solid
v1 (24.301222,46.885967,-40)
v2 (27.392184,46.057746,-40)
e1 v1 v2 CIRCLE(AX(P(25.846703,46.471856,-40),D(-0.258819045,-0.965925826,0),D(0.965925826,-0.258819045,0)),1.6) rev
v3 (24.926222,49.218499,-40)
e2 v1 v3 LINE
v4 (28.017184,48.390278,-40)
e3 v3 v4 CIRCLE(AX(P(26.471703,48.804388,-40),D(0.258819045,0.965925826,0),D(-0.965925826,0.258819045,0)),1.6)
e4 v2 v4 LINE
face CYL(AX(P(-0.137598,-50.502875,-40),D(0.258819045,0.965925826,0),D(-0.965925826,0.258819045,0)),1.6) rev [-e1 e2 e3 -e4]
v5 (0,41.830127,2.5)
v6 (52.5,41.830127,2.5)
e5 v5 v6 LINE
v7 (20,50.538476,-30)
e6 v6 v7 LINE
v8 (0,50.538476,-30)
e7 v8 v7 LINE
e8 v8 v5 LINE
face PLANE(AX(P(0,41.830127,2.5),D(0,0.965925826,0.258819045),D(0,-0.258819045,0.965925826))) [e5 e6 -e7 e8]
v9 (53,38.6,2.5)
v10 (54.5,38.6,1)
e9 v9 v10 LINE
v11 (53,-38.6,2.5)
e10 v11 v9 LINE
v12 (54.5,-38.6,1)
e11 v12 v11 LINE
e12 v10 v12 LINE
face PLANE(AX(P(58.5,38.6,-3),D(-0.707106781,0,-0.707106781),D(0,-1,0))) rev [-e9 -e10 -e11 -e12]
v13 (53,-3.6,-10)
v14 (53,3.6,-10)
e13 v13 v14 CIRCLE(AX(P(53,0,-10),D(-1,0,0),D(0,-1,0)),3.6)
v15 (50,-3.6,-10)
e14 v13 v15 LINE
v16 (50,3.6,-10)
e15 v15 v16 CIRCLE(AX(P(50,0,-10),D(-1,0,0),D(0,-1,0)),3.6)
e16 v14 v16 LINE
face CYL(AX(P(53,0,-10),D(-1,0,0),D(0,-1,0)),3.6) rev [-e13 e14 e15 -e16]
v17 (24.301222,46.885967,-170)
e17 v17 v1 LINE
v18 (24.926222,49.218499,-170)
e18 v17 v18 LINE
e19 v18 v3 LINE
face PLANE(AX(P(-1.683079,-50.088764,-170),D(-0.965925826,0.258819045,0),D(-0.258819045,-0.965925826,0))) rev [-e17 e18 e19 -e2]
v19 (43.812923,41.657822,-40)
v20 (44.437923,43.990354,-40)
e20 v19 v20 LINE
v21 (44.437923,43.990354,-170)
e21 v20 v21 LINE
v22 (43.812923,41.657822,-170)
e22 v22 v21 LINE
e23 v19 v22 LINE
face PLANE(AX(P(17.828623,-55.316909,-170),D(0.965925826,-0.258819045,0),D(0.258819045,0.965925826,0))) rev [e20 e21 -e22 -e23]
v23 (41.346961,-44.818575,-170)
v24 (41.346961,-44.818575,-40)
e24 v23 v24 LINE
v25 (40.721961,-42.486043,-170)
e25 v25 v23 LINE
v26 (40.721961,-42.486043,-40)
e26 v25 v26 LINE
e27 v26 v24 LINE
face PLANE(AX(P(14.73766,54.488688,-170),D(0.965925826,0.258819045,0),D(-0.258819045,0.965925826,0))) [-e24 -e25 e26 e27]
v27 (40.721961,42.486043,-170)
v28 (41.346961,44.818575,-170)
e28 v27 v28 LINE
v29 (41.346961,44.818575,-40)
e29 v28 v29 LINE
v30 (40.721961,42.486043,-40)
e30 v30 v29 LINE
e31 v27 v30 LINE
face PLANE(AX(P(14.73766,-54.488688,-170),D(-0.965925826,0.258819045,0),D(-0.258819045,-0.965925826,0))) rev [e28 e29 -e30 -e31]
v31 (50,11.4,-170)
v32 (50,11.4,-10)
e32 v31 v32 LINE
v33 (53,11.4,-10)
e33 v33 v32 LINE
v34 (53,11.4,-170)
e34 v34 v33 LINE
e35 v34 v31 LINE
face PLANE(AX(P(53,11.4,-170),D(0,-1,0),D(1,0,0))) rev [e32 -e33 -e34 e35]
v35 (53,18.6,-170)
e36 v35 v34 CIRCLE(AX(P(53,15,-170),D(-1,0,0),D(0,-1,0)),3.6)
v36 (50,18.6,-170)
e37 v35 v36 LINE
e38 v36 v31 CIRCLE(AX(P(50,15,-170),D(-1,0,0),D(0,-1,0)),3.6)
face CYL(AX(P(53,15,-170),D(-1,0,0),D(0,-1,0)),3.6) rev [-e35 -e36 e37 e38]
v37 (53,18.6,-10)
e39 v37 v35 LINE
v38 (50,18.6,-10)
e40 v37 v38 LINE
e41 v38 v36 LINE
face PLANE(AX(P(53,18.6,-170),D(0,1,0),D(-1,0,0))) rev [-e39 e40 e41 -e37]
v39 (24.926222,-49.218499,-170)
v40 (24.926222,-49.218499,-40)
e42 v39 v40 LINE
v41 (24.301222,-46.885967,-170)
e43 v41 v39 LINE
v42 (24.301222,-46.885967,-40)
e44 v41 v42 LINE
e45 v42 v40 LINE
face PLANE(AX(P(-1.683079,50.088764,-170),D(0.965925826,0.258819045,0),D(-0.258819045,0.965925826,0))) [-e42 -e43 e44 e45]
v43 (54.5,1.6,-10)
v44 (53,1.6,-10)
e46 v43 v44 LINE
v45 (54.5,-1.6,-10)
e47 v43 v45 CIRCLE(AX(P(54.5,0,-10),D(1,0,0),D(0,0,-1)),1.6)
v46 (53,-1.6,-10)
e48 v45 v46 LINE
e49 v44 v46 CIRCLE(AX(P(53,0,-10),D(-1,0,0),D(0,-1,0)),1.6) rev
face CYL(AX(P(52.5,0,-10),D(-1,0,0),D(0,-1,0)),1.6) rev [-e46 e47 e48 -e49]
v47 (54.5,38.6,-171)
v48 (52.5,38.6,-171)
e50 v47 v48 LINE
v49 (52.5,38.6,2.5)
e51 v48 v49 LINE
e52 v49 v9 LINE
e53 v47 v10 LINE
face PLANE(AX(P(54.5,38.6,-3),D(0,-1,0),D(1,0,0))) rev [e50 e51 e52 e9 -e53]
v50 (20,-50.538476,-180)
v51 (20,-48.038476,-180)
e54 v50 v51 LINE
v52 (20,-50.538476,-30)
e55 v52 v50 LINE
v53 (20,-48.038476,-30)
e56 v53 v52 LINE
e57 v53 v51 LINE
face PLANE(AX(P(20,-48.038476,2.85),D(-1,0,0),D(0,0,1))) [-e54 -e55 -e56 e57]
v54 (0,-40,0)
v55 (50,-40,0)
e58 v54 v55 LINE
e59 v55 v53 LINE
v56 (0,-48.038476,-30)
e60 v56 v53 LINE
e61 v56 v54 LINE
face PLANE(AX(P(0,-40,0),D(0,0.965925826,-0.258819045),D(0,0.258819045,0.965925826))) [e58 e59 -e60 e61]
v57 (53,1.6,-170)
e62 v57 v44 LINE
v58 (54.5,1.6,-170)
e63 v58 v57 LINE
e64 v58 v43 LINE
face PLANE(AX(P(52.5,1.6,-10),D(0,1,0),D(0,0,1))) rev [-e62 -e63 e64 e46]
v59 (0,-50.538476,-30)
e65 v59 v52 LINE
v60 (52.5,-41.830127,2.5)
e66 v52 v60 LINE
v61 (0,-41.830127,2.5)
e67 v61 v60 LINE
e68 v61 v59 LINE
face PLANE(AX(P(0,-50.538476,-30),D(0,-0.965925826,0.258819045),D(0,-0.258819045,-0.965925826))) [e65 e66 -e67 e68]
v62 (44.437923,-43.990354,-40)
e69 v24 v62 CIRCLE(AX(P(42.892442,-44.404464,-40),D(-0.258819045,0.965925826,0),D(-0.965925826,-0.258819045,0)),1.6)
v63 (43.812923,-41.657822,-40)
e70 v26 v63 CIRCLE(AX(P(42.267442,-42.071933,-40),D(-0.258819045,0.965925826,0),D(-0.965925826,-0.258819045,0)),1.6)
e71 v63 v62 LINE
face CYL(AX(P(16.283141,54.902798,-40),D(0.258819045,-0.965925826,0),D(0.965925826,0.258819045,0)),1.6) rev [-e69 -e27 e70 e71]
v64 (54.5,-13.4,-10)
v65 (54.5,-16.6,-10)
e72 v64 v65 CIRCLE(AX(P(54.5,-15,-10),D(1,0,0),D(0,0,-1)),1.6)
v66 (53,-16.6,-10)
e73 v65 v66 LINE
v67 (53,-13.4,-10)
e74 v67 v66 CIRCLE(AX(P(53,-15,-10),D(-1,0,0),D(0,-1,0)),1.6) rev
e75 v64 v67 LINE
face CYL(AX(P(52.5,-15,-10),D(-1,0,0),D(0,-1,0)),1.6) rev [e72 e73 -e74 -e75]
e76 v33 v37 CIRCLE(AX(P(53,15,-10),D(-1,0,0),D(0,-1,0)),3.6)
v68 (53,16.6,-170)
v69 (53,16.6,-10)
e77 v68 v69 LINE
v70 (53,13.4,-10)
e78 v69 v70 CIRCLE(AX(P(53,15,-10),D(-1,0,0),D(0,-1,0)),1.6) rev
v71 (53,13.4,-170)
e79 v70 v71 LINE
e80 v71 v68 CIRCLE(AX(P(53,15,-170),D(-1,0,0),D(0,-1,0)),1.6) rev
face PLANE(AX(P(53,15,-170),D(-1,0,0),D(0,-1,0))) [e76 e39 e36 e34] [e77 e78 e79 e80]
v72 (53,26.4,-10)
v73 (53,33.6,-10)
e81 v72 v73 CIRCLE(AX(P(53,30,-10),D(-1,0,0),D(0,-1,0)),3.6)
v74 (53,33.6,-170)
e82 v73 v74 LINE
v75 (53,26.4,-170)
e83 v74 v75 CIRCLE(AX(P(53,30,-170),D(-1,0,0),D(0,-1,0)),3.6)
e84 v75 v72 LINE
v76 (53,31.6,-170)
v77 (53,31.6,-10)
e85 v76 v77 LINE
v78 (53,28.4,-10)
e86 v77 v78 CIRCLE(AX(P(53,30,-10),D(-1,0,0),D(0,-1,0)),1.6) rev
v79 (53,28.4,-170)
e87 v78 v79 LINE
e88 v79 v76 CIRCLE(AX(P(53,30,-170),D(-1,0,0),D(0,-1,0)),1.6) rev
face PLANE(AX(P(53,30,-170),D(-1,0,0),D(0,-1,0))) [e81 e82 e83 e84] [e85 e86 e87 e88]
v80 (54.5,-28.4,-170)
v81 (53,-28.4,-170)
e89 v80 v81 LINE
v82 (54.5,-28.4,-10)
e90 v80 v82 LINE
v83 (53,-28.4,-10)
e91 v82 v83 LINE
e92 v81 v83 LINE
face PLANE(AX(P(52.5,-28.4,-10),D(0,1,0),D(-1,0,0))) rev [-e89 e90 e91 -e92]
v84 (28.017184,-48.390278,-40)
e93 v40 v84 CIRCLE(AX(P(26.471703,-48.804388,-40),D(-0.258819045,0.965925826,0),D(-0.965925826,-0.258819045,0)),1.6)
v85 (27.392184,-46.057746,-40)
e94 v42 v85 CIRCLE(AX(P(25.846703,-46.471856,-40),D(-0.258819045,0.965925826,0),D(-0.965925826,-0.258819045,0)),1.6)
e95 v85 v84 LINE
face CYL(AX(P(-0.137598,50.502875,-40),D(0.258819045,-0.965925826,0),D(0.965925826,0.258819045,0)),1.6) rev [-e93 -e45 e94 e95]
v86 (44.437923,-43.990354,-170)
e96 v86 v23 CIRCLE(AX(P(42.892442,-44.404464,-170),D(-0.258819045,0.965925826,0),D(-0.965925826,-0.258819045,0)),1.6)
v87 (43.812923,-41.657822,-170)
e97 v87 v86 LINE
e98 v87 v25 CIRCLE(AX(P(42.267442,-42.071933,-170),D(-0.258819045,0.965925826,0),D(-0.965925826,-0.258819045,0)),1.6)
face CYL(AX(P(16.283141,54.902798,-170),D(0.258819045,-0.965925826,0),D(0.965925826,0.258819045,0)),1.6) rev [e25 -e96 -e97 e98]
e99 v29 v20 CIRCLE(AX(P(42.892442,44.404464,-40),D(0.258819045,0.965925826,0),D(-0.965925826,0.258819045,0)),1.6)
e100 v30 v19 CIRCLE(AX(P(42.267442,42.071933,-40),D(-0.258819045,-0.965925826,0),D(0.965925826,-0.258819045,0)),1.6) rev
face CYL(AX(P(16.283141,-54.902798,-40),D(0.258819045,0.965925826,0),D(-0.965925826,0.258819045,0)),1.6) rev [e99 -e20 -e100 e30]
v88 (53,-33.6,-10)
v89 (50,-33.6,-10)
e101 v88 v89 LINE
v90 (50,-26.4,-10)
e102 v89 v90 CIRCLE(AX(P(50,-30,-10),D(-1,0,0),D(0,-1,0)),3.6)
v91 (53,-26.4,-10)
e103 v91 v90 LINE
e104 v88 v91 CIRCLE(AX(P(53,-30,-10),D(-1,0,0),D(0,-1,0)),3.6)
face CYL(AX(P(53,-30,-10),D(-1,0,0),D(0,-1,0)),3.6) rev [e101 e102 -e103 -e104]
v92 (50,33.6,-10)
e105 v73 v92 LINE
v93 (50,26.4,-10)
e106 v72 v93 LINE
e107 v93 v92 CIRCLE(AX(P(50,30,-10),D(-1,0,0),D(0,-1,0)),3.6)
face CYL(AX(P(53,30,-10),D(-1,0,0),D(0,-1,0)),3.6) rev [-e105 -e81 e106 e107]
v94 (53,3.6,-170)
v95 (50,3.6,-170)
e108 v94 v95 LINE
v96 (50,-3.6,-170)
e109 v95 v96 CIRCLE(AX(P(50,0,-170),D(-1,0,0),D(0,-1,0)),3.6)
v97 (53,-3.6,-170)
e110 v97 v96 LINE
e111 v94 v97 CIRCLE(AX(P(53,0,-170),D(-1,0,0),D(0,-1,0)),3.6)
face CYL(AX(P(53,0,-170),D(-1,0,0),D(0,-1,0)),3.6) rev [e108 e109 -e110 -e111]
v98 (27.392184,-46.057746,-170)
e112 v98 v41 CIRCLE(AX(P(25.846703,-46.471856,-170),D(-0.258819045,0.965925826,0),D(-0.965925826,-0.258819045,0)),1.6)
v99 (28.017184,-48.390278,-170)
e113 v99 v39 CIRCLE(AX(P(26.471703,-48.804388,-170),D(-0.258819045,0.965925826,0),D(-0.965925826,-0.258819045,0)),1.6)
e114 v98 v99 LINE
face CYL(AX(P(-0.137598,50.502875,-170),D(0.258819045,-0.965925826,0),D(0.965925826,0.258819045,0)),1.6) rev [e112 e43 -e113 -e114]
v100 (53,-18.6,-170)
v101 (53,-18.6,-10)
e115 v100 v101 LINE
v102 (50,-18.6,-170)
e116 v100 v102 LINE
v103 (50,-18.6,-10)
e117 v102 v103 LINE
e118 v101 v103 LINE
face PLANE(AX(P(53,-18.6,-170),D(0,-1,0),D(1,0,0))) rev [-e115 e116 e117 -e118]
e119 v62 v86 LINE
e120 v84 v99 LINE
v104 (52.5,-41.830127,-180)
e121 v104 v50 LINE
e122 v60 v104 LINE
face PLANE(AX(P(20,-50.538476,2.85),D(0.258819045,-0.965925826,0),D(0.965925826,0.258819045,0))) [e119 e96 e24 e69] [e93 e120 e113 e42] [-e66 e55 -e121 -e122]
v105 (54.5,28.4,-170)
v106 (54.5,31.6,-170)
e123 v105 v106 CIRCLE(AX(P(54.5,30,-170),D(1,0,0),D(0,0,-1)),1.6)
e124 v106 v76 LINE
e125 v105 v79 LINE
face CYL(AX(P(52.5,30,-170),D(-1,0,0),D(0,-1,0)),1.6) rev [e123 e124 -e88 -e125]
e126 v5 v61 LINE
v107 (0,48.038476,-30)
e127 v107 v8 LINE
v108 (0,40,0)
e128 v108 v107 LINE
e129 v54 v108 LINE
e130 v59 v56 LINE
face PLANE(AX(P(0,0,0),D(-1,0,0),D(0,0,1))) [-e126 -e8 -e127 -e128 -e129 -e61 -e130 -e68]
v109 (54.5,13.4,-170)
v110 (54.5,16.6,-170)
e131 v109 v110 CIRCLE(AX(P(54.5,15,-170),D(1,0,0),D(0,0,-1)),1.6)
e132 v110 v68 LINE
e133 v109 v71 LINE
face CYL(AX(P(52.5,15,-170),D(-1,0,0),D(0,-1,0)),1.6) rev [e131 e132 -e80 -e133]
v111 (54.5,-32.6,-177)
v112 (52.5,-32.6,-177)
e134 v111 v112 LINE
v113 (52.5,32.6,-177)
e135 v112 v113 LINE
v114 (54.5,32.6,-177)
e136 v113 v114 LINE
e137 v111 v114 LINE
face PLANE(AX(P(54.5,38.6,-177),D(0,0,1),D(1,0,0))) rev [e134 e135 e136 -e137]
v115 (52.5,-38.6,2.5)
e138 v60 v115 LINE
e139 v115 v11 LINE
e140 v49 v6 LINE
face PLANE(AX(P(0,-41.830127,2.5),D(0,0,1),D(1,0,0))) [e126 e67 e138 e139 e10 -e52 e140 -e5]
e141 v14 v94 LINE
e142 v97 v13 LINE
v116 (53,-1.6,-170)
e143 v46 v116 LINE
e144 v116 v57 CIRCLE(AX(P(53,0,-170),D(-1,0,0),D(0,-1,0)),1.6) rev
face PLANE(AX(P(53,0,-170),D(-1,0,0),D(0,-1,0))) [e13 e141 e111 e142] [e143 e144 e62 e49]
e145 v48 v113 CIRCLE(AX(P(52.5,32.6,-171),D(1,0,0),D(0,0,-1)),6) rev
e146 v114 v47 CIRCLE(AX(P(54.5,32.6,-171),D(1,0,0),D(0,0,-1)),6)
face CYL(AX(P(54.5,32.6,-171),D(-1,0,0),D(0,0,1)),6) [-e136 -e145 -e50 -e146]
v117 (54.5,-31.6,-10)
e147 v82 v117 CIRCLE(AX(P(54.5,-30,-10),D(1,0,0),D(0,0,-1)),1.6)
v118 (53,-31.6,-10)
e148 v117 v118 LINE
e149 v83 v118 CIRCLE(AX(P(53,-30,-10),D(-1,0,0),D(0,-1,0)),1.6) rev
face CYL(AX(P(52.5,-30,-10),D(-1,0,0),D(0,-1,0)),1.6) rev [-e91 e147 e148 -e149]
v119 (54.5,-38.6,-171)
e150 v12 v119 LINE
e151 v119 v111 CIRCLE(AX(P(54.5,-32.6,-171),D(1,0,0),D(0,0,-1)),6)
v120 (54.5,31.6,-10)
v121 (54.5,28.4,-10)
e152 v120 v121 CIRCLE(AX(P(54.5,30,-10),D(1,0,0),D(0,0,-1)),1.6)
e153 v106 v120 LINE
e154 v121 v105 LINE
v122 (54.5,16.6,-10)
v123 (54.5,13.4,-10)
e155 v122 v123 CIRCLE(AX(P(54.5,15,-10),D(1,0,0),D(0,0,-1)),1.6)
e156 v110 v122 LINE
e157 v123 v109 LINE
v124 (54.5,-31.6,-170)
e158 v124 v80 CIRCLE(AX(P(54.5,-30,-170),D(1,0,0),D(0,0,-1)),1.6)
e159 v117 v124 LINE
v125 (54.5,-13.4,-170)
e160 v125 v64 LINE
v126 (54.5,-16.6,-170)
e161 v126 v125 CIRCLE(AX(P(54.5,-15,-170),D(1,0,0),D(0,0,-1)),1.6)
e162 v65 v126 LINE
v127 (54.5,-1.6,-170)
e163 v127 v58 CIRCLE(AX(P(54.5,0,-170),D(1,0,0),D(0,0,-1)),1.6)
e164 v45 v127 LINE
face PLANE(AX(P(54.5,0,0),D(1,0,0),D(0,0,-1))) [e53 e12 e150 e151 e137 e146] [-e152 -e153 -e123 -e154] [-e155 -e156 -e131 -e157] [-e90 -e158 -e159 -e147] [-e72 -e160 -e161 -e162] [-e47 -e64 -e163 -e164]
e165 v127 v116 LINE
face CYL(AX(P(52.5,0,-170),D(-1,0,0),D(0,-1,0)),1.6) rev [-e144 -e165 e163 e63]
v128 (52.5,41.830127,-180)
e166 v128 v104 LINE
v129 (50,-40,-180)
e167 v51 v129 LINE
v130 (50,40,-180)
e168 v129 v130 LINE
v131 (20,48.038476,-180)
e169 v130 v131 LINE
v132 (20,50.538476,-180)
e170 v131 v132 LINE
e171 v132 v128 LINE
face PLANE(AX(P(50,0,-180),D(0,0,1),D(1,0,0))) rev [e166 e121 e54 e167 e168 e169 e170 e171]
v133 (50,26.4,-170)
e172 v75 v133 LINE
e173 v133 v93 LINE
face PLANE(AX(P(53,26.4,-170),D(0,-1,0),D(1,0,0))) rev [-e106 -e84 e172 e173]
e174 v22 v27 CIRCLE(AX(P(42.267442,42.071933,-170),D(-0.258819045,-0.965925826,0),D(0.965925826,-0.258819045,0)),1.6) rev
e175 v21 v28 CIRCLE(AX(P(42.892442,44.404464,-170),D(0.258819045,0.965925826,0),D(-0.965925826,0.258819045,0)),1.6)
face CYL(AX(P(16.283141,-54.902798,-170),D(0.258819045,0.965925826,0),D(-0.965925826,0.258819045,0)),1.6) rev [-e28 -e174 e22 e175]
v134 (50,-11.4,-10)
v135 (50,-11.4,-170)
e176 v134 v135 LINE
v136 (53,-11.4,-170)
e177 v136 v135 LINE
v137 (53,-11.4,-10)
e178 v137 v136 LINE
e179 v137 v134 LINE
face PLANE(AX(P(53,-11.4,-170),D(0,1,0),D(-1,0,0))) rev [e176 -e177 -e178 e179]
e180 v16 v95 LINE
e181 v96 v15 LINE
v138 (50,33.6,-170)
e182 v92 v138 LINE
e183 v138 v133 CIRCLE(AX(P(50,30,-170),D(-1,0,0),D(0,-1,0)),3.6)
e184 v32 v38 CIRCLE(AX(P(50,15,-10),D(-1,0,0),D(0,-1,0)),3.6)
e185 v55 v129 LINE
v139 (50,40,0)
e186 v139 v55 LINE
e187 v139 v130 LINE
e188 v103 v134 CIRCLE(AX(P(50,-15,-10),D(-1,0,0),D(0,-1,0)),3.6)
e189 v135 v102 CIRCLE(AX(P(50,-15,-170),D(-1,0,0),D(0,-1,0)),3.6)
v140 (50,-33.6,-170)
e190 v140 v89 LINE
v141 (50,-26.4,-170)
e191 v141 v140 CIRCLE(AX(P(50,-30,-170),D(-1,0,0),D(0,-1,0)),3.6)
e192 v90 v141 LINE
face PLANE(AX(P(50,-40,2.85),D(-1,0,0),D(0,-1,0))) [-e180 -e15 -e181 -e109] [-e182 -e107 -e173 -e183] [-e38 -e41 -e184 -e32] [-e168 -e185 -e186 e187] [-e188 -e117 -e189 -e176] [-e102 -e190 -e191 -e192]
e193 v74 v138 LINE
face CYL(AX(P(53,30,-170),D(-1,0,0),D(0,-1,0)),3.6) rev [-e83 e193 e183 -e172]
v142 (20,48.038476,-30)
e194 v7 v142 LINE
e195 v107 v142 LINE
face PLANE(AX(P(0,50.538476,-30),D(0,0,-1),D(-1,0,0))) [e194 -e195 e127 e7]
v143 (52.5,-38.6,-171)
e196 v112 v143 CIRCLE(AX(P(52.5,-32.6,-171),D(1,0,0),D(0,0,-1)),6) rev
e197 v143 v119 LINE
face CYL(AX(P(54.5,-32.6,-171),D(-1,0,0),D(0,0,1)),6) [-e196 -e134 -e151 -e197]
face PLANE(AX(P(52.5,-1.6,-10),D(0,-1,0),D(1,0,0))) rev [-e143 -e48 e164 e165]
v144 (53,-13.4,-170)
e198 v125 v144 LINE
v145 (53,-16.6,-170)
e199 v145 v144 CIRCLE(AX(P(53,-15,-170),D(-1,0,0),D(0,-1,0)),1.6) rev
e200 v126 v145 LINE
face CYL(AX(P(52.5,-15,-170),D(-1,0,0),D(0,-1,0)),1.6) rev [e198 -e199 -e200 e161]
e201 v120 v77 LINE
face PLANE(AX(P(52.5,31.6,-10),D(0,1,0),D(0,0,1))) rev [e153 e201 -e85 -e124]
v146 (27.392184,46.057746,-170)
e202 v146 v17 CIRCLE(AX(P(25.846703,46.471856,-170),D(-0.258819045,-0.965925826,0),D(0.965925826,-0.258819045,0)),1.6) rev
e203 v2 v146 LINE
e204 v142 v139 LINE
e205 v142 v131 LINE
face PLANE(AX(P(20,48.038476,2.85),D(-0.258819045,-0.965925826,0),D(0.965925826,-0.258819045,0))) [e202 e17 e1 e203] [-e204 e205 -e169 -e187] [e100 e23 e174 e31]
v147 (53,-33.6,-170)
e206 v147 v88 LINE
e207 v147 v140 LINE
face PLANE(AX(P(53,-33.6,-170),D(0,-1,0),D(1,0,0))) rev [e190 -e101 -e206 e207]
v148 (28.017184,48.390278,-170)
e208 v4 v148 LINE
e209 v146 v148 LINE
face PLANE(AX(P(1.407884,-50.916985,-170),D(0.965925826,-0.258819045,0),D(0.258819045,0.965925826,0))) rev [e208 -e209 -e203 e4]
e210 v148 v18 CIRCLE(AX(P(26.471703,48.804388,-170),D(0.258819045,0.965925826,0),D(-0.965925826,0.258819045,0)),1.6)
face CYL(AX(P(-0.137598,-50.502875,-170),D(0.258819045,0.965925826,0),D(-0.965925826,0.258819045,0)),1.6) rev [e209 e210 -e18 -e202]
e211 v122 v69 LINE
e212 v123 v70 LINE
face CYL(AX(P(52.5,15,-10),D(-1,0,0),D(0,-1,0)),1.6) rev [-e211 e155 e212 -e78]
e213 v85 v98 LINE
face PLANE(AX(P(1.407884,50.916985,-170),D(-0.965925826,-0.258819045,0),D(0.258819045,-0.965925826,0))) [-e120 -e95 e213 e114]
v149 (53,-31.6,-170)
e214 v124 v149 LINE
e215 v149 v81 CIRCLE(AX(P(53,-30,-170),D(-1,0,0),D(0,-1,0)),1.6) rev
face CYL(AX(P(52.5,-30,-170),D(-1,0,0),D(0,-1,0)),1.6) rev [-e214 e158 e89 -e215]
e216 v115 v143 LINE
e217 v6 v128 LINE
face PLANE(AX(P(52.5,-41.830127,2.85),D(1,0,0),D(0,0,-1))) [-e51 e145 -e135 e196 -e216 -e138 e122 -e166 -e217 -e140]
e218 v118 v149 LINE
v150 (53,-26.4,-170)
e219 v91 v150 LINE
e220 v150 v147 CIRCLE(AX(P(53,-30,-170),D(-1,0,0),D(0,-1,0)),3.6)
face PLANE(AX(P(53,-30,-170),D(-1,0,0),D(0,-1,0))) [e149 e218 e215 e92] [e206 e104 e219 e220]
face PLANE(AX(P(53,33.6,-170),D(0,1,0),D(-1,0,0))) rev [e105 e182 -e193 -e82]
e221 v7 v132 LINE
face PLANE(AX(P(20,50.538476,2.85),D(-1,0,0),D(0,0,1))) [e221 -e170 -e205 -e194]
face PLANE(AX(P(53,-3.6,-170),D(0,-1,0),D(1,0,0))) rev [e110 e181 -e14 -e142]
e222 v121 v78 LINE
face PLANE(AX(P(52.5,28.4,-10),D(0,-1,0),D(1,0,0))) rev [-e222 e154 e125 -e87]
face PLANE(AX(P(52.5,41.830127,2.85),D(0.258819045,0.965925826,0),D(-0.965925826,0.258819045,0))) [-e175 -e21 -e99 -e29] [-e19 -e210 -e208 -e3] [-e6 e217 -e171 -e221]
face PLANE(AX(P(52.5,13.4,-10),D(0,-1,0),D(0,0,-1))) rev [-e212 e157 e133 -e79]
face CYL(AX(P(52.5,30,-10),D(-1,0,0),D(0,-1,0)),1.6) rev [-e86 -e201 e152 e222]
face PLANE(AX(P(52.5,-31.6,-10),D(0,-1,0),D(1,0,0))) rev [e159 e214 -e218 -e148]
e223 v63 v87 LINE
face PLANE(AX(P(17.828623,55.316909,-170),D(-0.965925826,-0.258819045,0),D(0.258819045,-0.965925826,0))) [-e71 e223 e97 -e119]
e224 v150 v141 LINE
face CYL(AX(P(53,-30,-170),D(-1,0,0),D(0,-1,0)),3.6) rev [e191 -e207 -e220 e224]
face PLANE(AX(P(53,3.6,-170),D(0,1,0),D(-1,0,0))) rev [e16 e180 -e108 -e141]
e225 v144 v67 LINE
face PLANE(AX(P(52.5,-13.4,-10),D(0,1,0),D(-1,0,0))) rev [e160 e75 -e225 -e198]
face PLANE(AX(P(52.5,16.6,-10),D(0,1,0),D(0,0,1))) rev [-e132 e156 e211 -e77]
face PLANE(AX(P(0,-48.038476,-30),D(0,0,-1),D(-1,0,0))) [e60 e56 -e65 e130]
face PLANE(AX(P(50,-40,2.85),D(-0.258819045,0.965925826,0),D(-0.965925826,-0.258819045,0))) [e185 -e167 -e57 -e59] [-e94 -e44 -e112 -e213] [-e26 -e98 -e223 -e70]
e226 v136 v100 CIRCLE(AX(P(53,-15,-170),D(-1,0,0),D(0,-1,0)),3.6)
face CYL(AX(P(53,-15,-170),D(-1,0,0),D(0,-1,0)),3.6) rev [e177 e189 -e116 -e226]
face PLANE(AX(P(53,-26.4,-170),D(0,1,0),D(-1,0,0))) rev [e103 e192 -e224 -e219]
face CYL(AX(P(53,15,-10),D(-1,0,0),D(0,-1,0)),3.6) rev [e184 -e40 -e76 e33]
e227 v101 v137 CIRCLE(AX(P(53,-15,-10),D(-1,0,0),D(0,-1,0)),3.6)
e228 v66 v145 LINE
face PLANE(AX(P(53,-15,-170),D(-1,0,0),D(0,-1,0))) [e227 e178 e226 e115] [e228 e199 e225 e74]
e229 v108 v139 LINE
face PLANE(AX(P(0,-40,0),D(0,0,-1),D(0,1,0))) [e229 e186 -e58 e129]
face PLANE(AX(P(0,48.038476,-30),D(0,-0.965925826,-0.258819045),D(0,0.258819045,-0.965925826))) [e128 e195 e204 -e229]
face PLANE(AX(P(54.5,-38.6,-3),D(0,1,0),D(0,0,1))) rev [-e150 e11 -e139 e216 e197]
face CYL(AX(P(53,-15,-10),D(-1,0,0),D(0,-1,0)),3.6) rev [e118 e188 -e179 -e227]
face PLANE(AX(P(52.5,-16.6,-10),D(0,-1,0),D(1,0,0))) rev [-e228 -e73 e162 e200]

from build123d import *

# Parameters (mm, degrees)
CUT_EXTRUDE1_DEPTH  = 194.530714703
SKETCH7_W           = 174
SKETCH7_H           = 77.2
BOSS_EXTRUDE1_DEPTH = 2
CUT_EXTRUDE2_DEPTH  = 3
FILLET1_R           = 6
CHAMFER1_SIZE       = 6
CUT_EXTRUDE3_REACH  = 213.158


with BuildPart() as part:
    # Sweep1: sweep along a path in Sketch2
    with BuildLine(Plane(origin=(0, 0, 0), x_dir=(1, 0, 0), z_dir=(0, 1, 0))) as sweep1_path:
        Line((0, 0), (50, 0))
        Line((50, 0), (50, 180))
    # Sketch4 → Sweep1 (sweep)
    with BuildSketch(Plane(origin=(0, 0, 0), x_dir=(0, 0, -1), z_dir=(1, 0, 0))):
        Polygon((0, -40), (0, 40), (30, 48.038475773), (30, 50.538475773), (-2.5, 41.830127019), (-2.5, -41.830127019), (30, -50.538475773), (30, -48.038475773), align=None)
    sweep(path=sweep1_path.line, transition=Transition.RIGHT)

    # Sketch6 → Cut-Extrude1 (cut, through all)
    with BuildSketch(Plane.ZY.offset(-50)):
        with BuildLine():
            Line((-10, 28.4), (-170, 28.4))
            ThreePointArc((-170, 28.4), (-171.6, 30), (-170, 31.6))
            Line((-170, 31.6), (-10, 31.6))
            ThreePointArc((-10, 31.6), (-8.4, 30), (-10, 28.4))
        make_face()
        with BuildLine():
            Line((-10, -1.6), (-170, -1.6))
            ThreePointArc((-170, -1.6), (-171.6, 0), (-170, 1.6))
            Line((-170, 1.6), (-10, 1.6))
            ThreePointArc((-10, 1.6), (-8.4, 0), (-10, -1.6))
        make_face()
        with BuildLine():
            Line((-10, -31.6), (-170, -31.6))
            ThreePointArc((-170, -31.6), (-171.6, -30), (-170, -28.4))
            Line((-170, -28.4), (-10, -28.4))
            ThreePointArc((-10, -28.4), (-8.4, -30), (-10, -31.6))
        make_face()
        with BuildLine():
            Line((-10, -16.6), (-170, -16.6))
            ThreePointArc((-170, -16.6), (-171.6, -15), (-170, -13.4))
            Line((-170, -13.4), (-10, -13.4))
            ThreePointArc((-10, -13.4), (-8.4, -15), (-10, -16.6))
        make_face()
        with BuildLine():
            Line((-10, 13.4), (-170, 13.4))
            ThreePointArc((-170, 13.4), (-171.6, 15), (-170, 16.6))
            Line((-170, 16.6), (-10, 16.6))
            ThreePointArc((-10, 16.6), (-8.4, 15), (-10, 13.4))
        make_face()
    extrude(amount=-CUT_EXTRUDE1_DEPTH, mode=Mode.SUBTRACT)

    # Sketch7 → Boss-Extrude1 (add)
    with BuildSketch(Plane(origin=(52.5, 0, 0), x_dir=(0, 0, -1), z_dir=(1, 0, 0))):
        with Locations((90, 0)):
            Rectangle(SKETCH7_W, SKETCH7_H)
        with BuildLine():
            Line((170, -31.6), (10, -31.6))
            ThreePointArc((10, -31.6), (8.4, -30), (10, -28.4))
            Line((10, -28.4), (170, -28.4))
            ThreePointArc((170, -28.4), (171.6, -30), (170, -31.6))
        make_face(mode=Mode.SUBTRACT)
        with BuildLine():
            Line((170, -16.6), (10, -16.6))
            ThreePointArc((10, -16.6), (8.4, -15), (10, -13.4))
            Line((10, -13.4), (170, -13.4))
            ThreePointArc((170, -13.4), (171.6, -15), (170, -16.6))
        make_face(mode=Mode.SUBTRACT)
        with BuildLine():
            Line((10, 1.6), (170, 1.6))
            ThreePointArc((170, 1.6), (171.6, 0), (170, -1.6))
            Line((170, -1.6), (10, -1.6))
            ThreePointArc((10, -1.6), (8.4, 0), (10, 1.6))
        make_face(mode=Mode.SUBTRACT)
        with BuildLine():
            Line((170, 13.4), (10, 13.4))
            ThreePointArc((10, 13.4), (8.4, 15), (10, 16.6))
            Line((10, 16.6), (170, 16.6))
            ThreePointArc((170, 16.6), (171.6, 15), (170, 13.4))
        make_face(mode=Mode.SUBTRACT)
        with BuildLine():
            Line((170, 28.4), (10, 28.4))
            ThreePointArc((10, 28.4), (8.4, 30), (10, 31.6))
            Line((10, 31.6), (170, 31.6))
            ThreePointArc((170, 31.6), (171.6, 30), (170, 28.4))
        make_face(mode=Mode.SUBTRACT)
    extrude(amount=BOSS_EXTRUDE1_DEPTH)

    # Sketch9 → Cut-Extrude2 (cut)
    with BuildSketch(Plane.ZY.offset(-50)):
        with BuildLine():
            Line((-170, 33.6), (-10, 33.6))
            ThreePointArc((-10, 33.6), (-6.4, 30), (-10, 26.4))
            Line((-10, 26.4), (-170, 26.4))
            ThreePointArc((-170, 26.4), (-173.6, 30), (-170, 33.6))
        make_face()
        with BuildLine():
            Line((-170, 18.6), (-10, 18.6))
            ThreePointArc((-10, 18.6), (-6.4, 15), (-10, 11.4))
            Line((-10, 11.4), (-170, 11.4))
            ThreePointArc((-170, 11.4), (-173.6, 15), (-170, 18.6))
        make_face()
        with BuildLine():
            Line((-170, 3.6), (-10, 3.6))
            ThreePointArc((-10, 3.6), (-6.4, 0), (-10, -3.6))
            Line((-10, -3.6), (-170, -3.6))
            ThreePointArc((-170, -3.6), (-173.6, 0), (-170, 3.6))
        make_face()
        with BuildLine():
            Line((-170, -11.4), (-10, -11.4))
            ThreePointArc((-10, -11.4), (-6.4, -15), (-10, -18.6))
            Line((-10, -18.6), (-170, -18.6))
            ThreePointArc((-170, -18.6), (-173.6, -15), (-170, -11.4))
        make_face()
        with BuildLine():
            Line((-170, -26.4), (-10, -26.4))
            ThreePointArc((-10, -26.4), (-6.4, -30), (-10, -33.6))
            Line((-10, -33.6), (-170, -33.6))
            ThreePointArc((-170, -33.6), (-173.6, -30), (-170, -26.4))
        make_face()
    extrude(amount=-CUT_EXTRUDE2_DEPTH, mode=Mode.SUBTRACT)

    # Fillet1
    fillet1_edges = [part.edges().sort_by_distance(p)[0] for p in [
        (53.5, -38.6, -177),
        (53.5, 38.6, -177),
    ]]
    fillet(fillet1_edges, radius=FILLET1_R)

    # Chamfer1
    # the kernel refuses this chamfer: 6 mm, written as the material it adds along each edge
    with BuildSketch(Plane(origin=(52.5, -38.6, -3), x_dir=(-0.02749587661058908, 0, 0.9996219169112968), z_dir=(0, 1, 0))) as chamfer1_piece_1_section:
        Polygon((CHAMFER1_SIZE * 0.999621916911, CHAMFER1_SIZE * 0.0274958766106), (-CHAMFER1_SIZE * 0.0274958766106, CHAMFER1_SIZE * 0.999621916911), (0, 0), align=None)
    chamfer1_piece_1 = extrude(amount=77.2, mode=Mode.PRIVATE)
    chamfer1_piece_1 = split(chamfer1_piece_1, bisect_by=Plane(origin=(53.373608637, 0, 2.5), z_dir=(0, 0, -1)), keep=Keep.TOP, mode=Mode.PRIVATE)
    chamfer1_piece_1 = split(chamfer1_piece_1, bisect_by=Plane(origin=(54.5, 0, -0.51208469), z_dir=(-1, 0, 0)), keep=Keep.TOP, mode=Mode.PRIVATE)
    add(chamfer1_piece_1)

    # Sketch10 → Cut-Extrude3 (cut, up to next)
    with BuildSketch(Plane(origin=(13.974364905, 52.15303983, 0), x_dir=(0.9659258262890679, -0.25881904510252257, 0), z_dir=(0.2588190451025226, 0.9659258262890679, 0)), mode=Mode.PRIVATE) as cut_extrude3_sk1:
        with BuildLine():
            Line((14.538196485, 170), (14.538196485, 40))
            ThreePointArc((14.538196485, 40), (12.938196485, 38.4), (11.338196485, 40))
            Line((11.338196485, 40), (11.338196485, 170))
            ThreePointArc((11.338196485, 170), (12.938196485, 171.6), (14.538196485, 170))
        make_face()
    cut_extrude3_tool1 = extrude(cut_extrude3_sk1.sketch, amount=-CUT_EXTRUDE3_REACH, mode=Mode.PRIVATE) & part.part
    # Sketch10 → Cut-Extrude3 (cut, up to next)
    with BuildSketch(Plane(origin=(13.974364905, 52.15303983, 0), x_dir=(0.9659258262890679, -0.25881904510252257, 0), z_dir=(0.2588190451025226, 0.9659258262890679, 0)), mode=Mode.PRIVATE) as cut_extrude3_sk2:
        with BuildLine():
            Line((31.538196485, 170), (31.538196485, 40))
            ThreePointArc((31.538196485, 40), (29.938196485, 38.4), (28.338196485, 40))
            Line((28.338196485, 40), (28.338196485, 170))
            ThreePointArc((28.338196485, 170), (29.938196485, 171.6), (31.538196485, 170))
        make_face()
    cut_extrude3_tool2 = extrude(cut_extrude3_sk2.sketch, amount=-CUT_EXTRUDE3_REACH, mode=Mode.PRIVATE) & part.part
    cut_extrude3_1 = cut_extrude3_tool1.solids().sort_by_distance((26.471703, 48.804388, -105))[0]
    add(cut_extrude3_1, mode=Mode.SUBTRACT)
    cut_extrude3_2 = cut_extrude3_tool2.solids().sort_by_distance((42.892442, 44.404464, -105))[0]
    add(cut_extrude3_2, mode=Mode.SUBTRACT)
    cut_extrude3 = cut_extrude3_1 + cut_extrude3_2  # Cut-Extrude3 as one shape, for the pattern or mirror that repeats it

    # Mirror1: Cut-Extrude3 across plane
    add(cut_extrude3.mirror(Plane.ZX), mode=Mode.SUBTRACT)


solid = part.part
